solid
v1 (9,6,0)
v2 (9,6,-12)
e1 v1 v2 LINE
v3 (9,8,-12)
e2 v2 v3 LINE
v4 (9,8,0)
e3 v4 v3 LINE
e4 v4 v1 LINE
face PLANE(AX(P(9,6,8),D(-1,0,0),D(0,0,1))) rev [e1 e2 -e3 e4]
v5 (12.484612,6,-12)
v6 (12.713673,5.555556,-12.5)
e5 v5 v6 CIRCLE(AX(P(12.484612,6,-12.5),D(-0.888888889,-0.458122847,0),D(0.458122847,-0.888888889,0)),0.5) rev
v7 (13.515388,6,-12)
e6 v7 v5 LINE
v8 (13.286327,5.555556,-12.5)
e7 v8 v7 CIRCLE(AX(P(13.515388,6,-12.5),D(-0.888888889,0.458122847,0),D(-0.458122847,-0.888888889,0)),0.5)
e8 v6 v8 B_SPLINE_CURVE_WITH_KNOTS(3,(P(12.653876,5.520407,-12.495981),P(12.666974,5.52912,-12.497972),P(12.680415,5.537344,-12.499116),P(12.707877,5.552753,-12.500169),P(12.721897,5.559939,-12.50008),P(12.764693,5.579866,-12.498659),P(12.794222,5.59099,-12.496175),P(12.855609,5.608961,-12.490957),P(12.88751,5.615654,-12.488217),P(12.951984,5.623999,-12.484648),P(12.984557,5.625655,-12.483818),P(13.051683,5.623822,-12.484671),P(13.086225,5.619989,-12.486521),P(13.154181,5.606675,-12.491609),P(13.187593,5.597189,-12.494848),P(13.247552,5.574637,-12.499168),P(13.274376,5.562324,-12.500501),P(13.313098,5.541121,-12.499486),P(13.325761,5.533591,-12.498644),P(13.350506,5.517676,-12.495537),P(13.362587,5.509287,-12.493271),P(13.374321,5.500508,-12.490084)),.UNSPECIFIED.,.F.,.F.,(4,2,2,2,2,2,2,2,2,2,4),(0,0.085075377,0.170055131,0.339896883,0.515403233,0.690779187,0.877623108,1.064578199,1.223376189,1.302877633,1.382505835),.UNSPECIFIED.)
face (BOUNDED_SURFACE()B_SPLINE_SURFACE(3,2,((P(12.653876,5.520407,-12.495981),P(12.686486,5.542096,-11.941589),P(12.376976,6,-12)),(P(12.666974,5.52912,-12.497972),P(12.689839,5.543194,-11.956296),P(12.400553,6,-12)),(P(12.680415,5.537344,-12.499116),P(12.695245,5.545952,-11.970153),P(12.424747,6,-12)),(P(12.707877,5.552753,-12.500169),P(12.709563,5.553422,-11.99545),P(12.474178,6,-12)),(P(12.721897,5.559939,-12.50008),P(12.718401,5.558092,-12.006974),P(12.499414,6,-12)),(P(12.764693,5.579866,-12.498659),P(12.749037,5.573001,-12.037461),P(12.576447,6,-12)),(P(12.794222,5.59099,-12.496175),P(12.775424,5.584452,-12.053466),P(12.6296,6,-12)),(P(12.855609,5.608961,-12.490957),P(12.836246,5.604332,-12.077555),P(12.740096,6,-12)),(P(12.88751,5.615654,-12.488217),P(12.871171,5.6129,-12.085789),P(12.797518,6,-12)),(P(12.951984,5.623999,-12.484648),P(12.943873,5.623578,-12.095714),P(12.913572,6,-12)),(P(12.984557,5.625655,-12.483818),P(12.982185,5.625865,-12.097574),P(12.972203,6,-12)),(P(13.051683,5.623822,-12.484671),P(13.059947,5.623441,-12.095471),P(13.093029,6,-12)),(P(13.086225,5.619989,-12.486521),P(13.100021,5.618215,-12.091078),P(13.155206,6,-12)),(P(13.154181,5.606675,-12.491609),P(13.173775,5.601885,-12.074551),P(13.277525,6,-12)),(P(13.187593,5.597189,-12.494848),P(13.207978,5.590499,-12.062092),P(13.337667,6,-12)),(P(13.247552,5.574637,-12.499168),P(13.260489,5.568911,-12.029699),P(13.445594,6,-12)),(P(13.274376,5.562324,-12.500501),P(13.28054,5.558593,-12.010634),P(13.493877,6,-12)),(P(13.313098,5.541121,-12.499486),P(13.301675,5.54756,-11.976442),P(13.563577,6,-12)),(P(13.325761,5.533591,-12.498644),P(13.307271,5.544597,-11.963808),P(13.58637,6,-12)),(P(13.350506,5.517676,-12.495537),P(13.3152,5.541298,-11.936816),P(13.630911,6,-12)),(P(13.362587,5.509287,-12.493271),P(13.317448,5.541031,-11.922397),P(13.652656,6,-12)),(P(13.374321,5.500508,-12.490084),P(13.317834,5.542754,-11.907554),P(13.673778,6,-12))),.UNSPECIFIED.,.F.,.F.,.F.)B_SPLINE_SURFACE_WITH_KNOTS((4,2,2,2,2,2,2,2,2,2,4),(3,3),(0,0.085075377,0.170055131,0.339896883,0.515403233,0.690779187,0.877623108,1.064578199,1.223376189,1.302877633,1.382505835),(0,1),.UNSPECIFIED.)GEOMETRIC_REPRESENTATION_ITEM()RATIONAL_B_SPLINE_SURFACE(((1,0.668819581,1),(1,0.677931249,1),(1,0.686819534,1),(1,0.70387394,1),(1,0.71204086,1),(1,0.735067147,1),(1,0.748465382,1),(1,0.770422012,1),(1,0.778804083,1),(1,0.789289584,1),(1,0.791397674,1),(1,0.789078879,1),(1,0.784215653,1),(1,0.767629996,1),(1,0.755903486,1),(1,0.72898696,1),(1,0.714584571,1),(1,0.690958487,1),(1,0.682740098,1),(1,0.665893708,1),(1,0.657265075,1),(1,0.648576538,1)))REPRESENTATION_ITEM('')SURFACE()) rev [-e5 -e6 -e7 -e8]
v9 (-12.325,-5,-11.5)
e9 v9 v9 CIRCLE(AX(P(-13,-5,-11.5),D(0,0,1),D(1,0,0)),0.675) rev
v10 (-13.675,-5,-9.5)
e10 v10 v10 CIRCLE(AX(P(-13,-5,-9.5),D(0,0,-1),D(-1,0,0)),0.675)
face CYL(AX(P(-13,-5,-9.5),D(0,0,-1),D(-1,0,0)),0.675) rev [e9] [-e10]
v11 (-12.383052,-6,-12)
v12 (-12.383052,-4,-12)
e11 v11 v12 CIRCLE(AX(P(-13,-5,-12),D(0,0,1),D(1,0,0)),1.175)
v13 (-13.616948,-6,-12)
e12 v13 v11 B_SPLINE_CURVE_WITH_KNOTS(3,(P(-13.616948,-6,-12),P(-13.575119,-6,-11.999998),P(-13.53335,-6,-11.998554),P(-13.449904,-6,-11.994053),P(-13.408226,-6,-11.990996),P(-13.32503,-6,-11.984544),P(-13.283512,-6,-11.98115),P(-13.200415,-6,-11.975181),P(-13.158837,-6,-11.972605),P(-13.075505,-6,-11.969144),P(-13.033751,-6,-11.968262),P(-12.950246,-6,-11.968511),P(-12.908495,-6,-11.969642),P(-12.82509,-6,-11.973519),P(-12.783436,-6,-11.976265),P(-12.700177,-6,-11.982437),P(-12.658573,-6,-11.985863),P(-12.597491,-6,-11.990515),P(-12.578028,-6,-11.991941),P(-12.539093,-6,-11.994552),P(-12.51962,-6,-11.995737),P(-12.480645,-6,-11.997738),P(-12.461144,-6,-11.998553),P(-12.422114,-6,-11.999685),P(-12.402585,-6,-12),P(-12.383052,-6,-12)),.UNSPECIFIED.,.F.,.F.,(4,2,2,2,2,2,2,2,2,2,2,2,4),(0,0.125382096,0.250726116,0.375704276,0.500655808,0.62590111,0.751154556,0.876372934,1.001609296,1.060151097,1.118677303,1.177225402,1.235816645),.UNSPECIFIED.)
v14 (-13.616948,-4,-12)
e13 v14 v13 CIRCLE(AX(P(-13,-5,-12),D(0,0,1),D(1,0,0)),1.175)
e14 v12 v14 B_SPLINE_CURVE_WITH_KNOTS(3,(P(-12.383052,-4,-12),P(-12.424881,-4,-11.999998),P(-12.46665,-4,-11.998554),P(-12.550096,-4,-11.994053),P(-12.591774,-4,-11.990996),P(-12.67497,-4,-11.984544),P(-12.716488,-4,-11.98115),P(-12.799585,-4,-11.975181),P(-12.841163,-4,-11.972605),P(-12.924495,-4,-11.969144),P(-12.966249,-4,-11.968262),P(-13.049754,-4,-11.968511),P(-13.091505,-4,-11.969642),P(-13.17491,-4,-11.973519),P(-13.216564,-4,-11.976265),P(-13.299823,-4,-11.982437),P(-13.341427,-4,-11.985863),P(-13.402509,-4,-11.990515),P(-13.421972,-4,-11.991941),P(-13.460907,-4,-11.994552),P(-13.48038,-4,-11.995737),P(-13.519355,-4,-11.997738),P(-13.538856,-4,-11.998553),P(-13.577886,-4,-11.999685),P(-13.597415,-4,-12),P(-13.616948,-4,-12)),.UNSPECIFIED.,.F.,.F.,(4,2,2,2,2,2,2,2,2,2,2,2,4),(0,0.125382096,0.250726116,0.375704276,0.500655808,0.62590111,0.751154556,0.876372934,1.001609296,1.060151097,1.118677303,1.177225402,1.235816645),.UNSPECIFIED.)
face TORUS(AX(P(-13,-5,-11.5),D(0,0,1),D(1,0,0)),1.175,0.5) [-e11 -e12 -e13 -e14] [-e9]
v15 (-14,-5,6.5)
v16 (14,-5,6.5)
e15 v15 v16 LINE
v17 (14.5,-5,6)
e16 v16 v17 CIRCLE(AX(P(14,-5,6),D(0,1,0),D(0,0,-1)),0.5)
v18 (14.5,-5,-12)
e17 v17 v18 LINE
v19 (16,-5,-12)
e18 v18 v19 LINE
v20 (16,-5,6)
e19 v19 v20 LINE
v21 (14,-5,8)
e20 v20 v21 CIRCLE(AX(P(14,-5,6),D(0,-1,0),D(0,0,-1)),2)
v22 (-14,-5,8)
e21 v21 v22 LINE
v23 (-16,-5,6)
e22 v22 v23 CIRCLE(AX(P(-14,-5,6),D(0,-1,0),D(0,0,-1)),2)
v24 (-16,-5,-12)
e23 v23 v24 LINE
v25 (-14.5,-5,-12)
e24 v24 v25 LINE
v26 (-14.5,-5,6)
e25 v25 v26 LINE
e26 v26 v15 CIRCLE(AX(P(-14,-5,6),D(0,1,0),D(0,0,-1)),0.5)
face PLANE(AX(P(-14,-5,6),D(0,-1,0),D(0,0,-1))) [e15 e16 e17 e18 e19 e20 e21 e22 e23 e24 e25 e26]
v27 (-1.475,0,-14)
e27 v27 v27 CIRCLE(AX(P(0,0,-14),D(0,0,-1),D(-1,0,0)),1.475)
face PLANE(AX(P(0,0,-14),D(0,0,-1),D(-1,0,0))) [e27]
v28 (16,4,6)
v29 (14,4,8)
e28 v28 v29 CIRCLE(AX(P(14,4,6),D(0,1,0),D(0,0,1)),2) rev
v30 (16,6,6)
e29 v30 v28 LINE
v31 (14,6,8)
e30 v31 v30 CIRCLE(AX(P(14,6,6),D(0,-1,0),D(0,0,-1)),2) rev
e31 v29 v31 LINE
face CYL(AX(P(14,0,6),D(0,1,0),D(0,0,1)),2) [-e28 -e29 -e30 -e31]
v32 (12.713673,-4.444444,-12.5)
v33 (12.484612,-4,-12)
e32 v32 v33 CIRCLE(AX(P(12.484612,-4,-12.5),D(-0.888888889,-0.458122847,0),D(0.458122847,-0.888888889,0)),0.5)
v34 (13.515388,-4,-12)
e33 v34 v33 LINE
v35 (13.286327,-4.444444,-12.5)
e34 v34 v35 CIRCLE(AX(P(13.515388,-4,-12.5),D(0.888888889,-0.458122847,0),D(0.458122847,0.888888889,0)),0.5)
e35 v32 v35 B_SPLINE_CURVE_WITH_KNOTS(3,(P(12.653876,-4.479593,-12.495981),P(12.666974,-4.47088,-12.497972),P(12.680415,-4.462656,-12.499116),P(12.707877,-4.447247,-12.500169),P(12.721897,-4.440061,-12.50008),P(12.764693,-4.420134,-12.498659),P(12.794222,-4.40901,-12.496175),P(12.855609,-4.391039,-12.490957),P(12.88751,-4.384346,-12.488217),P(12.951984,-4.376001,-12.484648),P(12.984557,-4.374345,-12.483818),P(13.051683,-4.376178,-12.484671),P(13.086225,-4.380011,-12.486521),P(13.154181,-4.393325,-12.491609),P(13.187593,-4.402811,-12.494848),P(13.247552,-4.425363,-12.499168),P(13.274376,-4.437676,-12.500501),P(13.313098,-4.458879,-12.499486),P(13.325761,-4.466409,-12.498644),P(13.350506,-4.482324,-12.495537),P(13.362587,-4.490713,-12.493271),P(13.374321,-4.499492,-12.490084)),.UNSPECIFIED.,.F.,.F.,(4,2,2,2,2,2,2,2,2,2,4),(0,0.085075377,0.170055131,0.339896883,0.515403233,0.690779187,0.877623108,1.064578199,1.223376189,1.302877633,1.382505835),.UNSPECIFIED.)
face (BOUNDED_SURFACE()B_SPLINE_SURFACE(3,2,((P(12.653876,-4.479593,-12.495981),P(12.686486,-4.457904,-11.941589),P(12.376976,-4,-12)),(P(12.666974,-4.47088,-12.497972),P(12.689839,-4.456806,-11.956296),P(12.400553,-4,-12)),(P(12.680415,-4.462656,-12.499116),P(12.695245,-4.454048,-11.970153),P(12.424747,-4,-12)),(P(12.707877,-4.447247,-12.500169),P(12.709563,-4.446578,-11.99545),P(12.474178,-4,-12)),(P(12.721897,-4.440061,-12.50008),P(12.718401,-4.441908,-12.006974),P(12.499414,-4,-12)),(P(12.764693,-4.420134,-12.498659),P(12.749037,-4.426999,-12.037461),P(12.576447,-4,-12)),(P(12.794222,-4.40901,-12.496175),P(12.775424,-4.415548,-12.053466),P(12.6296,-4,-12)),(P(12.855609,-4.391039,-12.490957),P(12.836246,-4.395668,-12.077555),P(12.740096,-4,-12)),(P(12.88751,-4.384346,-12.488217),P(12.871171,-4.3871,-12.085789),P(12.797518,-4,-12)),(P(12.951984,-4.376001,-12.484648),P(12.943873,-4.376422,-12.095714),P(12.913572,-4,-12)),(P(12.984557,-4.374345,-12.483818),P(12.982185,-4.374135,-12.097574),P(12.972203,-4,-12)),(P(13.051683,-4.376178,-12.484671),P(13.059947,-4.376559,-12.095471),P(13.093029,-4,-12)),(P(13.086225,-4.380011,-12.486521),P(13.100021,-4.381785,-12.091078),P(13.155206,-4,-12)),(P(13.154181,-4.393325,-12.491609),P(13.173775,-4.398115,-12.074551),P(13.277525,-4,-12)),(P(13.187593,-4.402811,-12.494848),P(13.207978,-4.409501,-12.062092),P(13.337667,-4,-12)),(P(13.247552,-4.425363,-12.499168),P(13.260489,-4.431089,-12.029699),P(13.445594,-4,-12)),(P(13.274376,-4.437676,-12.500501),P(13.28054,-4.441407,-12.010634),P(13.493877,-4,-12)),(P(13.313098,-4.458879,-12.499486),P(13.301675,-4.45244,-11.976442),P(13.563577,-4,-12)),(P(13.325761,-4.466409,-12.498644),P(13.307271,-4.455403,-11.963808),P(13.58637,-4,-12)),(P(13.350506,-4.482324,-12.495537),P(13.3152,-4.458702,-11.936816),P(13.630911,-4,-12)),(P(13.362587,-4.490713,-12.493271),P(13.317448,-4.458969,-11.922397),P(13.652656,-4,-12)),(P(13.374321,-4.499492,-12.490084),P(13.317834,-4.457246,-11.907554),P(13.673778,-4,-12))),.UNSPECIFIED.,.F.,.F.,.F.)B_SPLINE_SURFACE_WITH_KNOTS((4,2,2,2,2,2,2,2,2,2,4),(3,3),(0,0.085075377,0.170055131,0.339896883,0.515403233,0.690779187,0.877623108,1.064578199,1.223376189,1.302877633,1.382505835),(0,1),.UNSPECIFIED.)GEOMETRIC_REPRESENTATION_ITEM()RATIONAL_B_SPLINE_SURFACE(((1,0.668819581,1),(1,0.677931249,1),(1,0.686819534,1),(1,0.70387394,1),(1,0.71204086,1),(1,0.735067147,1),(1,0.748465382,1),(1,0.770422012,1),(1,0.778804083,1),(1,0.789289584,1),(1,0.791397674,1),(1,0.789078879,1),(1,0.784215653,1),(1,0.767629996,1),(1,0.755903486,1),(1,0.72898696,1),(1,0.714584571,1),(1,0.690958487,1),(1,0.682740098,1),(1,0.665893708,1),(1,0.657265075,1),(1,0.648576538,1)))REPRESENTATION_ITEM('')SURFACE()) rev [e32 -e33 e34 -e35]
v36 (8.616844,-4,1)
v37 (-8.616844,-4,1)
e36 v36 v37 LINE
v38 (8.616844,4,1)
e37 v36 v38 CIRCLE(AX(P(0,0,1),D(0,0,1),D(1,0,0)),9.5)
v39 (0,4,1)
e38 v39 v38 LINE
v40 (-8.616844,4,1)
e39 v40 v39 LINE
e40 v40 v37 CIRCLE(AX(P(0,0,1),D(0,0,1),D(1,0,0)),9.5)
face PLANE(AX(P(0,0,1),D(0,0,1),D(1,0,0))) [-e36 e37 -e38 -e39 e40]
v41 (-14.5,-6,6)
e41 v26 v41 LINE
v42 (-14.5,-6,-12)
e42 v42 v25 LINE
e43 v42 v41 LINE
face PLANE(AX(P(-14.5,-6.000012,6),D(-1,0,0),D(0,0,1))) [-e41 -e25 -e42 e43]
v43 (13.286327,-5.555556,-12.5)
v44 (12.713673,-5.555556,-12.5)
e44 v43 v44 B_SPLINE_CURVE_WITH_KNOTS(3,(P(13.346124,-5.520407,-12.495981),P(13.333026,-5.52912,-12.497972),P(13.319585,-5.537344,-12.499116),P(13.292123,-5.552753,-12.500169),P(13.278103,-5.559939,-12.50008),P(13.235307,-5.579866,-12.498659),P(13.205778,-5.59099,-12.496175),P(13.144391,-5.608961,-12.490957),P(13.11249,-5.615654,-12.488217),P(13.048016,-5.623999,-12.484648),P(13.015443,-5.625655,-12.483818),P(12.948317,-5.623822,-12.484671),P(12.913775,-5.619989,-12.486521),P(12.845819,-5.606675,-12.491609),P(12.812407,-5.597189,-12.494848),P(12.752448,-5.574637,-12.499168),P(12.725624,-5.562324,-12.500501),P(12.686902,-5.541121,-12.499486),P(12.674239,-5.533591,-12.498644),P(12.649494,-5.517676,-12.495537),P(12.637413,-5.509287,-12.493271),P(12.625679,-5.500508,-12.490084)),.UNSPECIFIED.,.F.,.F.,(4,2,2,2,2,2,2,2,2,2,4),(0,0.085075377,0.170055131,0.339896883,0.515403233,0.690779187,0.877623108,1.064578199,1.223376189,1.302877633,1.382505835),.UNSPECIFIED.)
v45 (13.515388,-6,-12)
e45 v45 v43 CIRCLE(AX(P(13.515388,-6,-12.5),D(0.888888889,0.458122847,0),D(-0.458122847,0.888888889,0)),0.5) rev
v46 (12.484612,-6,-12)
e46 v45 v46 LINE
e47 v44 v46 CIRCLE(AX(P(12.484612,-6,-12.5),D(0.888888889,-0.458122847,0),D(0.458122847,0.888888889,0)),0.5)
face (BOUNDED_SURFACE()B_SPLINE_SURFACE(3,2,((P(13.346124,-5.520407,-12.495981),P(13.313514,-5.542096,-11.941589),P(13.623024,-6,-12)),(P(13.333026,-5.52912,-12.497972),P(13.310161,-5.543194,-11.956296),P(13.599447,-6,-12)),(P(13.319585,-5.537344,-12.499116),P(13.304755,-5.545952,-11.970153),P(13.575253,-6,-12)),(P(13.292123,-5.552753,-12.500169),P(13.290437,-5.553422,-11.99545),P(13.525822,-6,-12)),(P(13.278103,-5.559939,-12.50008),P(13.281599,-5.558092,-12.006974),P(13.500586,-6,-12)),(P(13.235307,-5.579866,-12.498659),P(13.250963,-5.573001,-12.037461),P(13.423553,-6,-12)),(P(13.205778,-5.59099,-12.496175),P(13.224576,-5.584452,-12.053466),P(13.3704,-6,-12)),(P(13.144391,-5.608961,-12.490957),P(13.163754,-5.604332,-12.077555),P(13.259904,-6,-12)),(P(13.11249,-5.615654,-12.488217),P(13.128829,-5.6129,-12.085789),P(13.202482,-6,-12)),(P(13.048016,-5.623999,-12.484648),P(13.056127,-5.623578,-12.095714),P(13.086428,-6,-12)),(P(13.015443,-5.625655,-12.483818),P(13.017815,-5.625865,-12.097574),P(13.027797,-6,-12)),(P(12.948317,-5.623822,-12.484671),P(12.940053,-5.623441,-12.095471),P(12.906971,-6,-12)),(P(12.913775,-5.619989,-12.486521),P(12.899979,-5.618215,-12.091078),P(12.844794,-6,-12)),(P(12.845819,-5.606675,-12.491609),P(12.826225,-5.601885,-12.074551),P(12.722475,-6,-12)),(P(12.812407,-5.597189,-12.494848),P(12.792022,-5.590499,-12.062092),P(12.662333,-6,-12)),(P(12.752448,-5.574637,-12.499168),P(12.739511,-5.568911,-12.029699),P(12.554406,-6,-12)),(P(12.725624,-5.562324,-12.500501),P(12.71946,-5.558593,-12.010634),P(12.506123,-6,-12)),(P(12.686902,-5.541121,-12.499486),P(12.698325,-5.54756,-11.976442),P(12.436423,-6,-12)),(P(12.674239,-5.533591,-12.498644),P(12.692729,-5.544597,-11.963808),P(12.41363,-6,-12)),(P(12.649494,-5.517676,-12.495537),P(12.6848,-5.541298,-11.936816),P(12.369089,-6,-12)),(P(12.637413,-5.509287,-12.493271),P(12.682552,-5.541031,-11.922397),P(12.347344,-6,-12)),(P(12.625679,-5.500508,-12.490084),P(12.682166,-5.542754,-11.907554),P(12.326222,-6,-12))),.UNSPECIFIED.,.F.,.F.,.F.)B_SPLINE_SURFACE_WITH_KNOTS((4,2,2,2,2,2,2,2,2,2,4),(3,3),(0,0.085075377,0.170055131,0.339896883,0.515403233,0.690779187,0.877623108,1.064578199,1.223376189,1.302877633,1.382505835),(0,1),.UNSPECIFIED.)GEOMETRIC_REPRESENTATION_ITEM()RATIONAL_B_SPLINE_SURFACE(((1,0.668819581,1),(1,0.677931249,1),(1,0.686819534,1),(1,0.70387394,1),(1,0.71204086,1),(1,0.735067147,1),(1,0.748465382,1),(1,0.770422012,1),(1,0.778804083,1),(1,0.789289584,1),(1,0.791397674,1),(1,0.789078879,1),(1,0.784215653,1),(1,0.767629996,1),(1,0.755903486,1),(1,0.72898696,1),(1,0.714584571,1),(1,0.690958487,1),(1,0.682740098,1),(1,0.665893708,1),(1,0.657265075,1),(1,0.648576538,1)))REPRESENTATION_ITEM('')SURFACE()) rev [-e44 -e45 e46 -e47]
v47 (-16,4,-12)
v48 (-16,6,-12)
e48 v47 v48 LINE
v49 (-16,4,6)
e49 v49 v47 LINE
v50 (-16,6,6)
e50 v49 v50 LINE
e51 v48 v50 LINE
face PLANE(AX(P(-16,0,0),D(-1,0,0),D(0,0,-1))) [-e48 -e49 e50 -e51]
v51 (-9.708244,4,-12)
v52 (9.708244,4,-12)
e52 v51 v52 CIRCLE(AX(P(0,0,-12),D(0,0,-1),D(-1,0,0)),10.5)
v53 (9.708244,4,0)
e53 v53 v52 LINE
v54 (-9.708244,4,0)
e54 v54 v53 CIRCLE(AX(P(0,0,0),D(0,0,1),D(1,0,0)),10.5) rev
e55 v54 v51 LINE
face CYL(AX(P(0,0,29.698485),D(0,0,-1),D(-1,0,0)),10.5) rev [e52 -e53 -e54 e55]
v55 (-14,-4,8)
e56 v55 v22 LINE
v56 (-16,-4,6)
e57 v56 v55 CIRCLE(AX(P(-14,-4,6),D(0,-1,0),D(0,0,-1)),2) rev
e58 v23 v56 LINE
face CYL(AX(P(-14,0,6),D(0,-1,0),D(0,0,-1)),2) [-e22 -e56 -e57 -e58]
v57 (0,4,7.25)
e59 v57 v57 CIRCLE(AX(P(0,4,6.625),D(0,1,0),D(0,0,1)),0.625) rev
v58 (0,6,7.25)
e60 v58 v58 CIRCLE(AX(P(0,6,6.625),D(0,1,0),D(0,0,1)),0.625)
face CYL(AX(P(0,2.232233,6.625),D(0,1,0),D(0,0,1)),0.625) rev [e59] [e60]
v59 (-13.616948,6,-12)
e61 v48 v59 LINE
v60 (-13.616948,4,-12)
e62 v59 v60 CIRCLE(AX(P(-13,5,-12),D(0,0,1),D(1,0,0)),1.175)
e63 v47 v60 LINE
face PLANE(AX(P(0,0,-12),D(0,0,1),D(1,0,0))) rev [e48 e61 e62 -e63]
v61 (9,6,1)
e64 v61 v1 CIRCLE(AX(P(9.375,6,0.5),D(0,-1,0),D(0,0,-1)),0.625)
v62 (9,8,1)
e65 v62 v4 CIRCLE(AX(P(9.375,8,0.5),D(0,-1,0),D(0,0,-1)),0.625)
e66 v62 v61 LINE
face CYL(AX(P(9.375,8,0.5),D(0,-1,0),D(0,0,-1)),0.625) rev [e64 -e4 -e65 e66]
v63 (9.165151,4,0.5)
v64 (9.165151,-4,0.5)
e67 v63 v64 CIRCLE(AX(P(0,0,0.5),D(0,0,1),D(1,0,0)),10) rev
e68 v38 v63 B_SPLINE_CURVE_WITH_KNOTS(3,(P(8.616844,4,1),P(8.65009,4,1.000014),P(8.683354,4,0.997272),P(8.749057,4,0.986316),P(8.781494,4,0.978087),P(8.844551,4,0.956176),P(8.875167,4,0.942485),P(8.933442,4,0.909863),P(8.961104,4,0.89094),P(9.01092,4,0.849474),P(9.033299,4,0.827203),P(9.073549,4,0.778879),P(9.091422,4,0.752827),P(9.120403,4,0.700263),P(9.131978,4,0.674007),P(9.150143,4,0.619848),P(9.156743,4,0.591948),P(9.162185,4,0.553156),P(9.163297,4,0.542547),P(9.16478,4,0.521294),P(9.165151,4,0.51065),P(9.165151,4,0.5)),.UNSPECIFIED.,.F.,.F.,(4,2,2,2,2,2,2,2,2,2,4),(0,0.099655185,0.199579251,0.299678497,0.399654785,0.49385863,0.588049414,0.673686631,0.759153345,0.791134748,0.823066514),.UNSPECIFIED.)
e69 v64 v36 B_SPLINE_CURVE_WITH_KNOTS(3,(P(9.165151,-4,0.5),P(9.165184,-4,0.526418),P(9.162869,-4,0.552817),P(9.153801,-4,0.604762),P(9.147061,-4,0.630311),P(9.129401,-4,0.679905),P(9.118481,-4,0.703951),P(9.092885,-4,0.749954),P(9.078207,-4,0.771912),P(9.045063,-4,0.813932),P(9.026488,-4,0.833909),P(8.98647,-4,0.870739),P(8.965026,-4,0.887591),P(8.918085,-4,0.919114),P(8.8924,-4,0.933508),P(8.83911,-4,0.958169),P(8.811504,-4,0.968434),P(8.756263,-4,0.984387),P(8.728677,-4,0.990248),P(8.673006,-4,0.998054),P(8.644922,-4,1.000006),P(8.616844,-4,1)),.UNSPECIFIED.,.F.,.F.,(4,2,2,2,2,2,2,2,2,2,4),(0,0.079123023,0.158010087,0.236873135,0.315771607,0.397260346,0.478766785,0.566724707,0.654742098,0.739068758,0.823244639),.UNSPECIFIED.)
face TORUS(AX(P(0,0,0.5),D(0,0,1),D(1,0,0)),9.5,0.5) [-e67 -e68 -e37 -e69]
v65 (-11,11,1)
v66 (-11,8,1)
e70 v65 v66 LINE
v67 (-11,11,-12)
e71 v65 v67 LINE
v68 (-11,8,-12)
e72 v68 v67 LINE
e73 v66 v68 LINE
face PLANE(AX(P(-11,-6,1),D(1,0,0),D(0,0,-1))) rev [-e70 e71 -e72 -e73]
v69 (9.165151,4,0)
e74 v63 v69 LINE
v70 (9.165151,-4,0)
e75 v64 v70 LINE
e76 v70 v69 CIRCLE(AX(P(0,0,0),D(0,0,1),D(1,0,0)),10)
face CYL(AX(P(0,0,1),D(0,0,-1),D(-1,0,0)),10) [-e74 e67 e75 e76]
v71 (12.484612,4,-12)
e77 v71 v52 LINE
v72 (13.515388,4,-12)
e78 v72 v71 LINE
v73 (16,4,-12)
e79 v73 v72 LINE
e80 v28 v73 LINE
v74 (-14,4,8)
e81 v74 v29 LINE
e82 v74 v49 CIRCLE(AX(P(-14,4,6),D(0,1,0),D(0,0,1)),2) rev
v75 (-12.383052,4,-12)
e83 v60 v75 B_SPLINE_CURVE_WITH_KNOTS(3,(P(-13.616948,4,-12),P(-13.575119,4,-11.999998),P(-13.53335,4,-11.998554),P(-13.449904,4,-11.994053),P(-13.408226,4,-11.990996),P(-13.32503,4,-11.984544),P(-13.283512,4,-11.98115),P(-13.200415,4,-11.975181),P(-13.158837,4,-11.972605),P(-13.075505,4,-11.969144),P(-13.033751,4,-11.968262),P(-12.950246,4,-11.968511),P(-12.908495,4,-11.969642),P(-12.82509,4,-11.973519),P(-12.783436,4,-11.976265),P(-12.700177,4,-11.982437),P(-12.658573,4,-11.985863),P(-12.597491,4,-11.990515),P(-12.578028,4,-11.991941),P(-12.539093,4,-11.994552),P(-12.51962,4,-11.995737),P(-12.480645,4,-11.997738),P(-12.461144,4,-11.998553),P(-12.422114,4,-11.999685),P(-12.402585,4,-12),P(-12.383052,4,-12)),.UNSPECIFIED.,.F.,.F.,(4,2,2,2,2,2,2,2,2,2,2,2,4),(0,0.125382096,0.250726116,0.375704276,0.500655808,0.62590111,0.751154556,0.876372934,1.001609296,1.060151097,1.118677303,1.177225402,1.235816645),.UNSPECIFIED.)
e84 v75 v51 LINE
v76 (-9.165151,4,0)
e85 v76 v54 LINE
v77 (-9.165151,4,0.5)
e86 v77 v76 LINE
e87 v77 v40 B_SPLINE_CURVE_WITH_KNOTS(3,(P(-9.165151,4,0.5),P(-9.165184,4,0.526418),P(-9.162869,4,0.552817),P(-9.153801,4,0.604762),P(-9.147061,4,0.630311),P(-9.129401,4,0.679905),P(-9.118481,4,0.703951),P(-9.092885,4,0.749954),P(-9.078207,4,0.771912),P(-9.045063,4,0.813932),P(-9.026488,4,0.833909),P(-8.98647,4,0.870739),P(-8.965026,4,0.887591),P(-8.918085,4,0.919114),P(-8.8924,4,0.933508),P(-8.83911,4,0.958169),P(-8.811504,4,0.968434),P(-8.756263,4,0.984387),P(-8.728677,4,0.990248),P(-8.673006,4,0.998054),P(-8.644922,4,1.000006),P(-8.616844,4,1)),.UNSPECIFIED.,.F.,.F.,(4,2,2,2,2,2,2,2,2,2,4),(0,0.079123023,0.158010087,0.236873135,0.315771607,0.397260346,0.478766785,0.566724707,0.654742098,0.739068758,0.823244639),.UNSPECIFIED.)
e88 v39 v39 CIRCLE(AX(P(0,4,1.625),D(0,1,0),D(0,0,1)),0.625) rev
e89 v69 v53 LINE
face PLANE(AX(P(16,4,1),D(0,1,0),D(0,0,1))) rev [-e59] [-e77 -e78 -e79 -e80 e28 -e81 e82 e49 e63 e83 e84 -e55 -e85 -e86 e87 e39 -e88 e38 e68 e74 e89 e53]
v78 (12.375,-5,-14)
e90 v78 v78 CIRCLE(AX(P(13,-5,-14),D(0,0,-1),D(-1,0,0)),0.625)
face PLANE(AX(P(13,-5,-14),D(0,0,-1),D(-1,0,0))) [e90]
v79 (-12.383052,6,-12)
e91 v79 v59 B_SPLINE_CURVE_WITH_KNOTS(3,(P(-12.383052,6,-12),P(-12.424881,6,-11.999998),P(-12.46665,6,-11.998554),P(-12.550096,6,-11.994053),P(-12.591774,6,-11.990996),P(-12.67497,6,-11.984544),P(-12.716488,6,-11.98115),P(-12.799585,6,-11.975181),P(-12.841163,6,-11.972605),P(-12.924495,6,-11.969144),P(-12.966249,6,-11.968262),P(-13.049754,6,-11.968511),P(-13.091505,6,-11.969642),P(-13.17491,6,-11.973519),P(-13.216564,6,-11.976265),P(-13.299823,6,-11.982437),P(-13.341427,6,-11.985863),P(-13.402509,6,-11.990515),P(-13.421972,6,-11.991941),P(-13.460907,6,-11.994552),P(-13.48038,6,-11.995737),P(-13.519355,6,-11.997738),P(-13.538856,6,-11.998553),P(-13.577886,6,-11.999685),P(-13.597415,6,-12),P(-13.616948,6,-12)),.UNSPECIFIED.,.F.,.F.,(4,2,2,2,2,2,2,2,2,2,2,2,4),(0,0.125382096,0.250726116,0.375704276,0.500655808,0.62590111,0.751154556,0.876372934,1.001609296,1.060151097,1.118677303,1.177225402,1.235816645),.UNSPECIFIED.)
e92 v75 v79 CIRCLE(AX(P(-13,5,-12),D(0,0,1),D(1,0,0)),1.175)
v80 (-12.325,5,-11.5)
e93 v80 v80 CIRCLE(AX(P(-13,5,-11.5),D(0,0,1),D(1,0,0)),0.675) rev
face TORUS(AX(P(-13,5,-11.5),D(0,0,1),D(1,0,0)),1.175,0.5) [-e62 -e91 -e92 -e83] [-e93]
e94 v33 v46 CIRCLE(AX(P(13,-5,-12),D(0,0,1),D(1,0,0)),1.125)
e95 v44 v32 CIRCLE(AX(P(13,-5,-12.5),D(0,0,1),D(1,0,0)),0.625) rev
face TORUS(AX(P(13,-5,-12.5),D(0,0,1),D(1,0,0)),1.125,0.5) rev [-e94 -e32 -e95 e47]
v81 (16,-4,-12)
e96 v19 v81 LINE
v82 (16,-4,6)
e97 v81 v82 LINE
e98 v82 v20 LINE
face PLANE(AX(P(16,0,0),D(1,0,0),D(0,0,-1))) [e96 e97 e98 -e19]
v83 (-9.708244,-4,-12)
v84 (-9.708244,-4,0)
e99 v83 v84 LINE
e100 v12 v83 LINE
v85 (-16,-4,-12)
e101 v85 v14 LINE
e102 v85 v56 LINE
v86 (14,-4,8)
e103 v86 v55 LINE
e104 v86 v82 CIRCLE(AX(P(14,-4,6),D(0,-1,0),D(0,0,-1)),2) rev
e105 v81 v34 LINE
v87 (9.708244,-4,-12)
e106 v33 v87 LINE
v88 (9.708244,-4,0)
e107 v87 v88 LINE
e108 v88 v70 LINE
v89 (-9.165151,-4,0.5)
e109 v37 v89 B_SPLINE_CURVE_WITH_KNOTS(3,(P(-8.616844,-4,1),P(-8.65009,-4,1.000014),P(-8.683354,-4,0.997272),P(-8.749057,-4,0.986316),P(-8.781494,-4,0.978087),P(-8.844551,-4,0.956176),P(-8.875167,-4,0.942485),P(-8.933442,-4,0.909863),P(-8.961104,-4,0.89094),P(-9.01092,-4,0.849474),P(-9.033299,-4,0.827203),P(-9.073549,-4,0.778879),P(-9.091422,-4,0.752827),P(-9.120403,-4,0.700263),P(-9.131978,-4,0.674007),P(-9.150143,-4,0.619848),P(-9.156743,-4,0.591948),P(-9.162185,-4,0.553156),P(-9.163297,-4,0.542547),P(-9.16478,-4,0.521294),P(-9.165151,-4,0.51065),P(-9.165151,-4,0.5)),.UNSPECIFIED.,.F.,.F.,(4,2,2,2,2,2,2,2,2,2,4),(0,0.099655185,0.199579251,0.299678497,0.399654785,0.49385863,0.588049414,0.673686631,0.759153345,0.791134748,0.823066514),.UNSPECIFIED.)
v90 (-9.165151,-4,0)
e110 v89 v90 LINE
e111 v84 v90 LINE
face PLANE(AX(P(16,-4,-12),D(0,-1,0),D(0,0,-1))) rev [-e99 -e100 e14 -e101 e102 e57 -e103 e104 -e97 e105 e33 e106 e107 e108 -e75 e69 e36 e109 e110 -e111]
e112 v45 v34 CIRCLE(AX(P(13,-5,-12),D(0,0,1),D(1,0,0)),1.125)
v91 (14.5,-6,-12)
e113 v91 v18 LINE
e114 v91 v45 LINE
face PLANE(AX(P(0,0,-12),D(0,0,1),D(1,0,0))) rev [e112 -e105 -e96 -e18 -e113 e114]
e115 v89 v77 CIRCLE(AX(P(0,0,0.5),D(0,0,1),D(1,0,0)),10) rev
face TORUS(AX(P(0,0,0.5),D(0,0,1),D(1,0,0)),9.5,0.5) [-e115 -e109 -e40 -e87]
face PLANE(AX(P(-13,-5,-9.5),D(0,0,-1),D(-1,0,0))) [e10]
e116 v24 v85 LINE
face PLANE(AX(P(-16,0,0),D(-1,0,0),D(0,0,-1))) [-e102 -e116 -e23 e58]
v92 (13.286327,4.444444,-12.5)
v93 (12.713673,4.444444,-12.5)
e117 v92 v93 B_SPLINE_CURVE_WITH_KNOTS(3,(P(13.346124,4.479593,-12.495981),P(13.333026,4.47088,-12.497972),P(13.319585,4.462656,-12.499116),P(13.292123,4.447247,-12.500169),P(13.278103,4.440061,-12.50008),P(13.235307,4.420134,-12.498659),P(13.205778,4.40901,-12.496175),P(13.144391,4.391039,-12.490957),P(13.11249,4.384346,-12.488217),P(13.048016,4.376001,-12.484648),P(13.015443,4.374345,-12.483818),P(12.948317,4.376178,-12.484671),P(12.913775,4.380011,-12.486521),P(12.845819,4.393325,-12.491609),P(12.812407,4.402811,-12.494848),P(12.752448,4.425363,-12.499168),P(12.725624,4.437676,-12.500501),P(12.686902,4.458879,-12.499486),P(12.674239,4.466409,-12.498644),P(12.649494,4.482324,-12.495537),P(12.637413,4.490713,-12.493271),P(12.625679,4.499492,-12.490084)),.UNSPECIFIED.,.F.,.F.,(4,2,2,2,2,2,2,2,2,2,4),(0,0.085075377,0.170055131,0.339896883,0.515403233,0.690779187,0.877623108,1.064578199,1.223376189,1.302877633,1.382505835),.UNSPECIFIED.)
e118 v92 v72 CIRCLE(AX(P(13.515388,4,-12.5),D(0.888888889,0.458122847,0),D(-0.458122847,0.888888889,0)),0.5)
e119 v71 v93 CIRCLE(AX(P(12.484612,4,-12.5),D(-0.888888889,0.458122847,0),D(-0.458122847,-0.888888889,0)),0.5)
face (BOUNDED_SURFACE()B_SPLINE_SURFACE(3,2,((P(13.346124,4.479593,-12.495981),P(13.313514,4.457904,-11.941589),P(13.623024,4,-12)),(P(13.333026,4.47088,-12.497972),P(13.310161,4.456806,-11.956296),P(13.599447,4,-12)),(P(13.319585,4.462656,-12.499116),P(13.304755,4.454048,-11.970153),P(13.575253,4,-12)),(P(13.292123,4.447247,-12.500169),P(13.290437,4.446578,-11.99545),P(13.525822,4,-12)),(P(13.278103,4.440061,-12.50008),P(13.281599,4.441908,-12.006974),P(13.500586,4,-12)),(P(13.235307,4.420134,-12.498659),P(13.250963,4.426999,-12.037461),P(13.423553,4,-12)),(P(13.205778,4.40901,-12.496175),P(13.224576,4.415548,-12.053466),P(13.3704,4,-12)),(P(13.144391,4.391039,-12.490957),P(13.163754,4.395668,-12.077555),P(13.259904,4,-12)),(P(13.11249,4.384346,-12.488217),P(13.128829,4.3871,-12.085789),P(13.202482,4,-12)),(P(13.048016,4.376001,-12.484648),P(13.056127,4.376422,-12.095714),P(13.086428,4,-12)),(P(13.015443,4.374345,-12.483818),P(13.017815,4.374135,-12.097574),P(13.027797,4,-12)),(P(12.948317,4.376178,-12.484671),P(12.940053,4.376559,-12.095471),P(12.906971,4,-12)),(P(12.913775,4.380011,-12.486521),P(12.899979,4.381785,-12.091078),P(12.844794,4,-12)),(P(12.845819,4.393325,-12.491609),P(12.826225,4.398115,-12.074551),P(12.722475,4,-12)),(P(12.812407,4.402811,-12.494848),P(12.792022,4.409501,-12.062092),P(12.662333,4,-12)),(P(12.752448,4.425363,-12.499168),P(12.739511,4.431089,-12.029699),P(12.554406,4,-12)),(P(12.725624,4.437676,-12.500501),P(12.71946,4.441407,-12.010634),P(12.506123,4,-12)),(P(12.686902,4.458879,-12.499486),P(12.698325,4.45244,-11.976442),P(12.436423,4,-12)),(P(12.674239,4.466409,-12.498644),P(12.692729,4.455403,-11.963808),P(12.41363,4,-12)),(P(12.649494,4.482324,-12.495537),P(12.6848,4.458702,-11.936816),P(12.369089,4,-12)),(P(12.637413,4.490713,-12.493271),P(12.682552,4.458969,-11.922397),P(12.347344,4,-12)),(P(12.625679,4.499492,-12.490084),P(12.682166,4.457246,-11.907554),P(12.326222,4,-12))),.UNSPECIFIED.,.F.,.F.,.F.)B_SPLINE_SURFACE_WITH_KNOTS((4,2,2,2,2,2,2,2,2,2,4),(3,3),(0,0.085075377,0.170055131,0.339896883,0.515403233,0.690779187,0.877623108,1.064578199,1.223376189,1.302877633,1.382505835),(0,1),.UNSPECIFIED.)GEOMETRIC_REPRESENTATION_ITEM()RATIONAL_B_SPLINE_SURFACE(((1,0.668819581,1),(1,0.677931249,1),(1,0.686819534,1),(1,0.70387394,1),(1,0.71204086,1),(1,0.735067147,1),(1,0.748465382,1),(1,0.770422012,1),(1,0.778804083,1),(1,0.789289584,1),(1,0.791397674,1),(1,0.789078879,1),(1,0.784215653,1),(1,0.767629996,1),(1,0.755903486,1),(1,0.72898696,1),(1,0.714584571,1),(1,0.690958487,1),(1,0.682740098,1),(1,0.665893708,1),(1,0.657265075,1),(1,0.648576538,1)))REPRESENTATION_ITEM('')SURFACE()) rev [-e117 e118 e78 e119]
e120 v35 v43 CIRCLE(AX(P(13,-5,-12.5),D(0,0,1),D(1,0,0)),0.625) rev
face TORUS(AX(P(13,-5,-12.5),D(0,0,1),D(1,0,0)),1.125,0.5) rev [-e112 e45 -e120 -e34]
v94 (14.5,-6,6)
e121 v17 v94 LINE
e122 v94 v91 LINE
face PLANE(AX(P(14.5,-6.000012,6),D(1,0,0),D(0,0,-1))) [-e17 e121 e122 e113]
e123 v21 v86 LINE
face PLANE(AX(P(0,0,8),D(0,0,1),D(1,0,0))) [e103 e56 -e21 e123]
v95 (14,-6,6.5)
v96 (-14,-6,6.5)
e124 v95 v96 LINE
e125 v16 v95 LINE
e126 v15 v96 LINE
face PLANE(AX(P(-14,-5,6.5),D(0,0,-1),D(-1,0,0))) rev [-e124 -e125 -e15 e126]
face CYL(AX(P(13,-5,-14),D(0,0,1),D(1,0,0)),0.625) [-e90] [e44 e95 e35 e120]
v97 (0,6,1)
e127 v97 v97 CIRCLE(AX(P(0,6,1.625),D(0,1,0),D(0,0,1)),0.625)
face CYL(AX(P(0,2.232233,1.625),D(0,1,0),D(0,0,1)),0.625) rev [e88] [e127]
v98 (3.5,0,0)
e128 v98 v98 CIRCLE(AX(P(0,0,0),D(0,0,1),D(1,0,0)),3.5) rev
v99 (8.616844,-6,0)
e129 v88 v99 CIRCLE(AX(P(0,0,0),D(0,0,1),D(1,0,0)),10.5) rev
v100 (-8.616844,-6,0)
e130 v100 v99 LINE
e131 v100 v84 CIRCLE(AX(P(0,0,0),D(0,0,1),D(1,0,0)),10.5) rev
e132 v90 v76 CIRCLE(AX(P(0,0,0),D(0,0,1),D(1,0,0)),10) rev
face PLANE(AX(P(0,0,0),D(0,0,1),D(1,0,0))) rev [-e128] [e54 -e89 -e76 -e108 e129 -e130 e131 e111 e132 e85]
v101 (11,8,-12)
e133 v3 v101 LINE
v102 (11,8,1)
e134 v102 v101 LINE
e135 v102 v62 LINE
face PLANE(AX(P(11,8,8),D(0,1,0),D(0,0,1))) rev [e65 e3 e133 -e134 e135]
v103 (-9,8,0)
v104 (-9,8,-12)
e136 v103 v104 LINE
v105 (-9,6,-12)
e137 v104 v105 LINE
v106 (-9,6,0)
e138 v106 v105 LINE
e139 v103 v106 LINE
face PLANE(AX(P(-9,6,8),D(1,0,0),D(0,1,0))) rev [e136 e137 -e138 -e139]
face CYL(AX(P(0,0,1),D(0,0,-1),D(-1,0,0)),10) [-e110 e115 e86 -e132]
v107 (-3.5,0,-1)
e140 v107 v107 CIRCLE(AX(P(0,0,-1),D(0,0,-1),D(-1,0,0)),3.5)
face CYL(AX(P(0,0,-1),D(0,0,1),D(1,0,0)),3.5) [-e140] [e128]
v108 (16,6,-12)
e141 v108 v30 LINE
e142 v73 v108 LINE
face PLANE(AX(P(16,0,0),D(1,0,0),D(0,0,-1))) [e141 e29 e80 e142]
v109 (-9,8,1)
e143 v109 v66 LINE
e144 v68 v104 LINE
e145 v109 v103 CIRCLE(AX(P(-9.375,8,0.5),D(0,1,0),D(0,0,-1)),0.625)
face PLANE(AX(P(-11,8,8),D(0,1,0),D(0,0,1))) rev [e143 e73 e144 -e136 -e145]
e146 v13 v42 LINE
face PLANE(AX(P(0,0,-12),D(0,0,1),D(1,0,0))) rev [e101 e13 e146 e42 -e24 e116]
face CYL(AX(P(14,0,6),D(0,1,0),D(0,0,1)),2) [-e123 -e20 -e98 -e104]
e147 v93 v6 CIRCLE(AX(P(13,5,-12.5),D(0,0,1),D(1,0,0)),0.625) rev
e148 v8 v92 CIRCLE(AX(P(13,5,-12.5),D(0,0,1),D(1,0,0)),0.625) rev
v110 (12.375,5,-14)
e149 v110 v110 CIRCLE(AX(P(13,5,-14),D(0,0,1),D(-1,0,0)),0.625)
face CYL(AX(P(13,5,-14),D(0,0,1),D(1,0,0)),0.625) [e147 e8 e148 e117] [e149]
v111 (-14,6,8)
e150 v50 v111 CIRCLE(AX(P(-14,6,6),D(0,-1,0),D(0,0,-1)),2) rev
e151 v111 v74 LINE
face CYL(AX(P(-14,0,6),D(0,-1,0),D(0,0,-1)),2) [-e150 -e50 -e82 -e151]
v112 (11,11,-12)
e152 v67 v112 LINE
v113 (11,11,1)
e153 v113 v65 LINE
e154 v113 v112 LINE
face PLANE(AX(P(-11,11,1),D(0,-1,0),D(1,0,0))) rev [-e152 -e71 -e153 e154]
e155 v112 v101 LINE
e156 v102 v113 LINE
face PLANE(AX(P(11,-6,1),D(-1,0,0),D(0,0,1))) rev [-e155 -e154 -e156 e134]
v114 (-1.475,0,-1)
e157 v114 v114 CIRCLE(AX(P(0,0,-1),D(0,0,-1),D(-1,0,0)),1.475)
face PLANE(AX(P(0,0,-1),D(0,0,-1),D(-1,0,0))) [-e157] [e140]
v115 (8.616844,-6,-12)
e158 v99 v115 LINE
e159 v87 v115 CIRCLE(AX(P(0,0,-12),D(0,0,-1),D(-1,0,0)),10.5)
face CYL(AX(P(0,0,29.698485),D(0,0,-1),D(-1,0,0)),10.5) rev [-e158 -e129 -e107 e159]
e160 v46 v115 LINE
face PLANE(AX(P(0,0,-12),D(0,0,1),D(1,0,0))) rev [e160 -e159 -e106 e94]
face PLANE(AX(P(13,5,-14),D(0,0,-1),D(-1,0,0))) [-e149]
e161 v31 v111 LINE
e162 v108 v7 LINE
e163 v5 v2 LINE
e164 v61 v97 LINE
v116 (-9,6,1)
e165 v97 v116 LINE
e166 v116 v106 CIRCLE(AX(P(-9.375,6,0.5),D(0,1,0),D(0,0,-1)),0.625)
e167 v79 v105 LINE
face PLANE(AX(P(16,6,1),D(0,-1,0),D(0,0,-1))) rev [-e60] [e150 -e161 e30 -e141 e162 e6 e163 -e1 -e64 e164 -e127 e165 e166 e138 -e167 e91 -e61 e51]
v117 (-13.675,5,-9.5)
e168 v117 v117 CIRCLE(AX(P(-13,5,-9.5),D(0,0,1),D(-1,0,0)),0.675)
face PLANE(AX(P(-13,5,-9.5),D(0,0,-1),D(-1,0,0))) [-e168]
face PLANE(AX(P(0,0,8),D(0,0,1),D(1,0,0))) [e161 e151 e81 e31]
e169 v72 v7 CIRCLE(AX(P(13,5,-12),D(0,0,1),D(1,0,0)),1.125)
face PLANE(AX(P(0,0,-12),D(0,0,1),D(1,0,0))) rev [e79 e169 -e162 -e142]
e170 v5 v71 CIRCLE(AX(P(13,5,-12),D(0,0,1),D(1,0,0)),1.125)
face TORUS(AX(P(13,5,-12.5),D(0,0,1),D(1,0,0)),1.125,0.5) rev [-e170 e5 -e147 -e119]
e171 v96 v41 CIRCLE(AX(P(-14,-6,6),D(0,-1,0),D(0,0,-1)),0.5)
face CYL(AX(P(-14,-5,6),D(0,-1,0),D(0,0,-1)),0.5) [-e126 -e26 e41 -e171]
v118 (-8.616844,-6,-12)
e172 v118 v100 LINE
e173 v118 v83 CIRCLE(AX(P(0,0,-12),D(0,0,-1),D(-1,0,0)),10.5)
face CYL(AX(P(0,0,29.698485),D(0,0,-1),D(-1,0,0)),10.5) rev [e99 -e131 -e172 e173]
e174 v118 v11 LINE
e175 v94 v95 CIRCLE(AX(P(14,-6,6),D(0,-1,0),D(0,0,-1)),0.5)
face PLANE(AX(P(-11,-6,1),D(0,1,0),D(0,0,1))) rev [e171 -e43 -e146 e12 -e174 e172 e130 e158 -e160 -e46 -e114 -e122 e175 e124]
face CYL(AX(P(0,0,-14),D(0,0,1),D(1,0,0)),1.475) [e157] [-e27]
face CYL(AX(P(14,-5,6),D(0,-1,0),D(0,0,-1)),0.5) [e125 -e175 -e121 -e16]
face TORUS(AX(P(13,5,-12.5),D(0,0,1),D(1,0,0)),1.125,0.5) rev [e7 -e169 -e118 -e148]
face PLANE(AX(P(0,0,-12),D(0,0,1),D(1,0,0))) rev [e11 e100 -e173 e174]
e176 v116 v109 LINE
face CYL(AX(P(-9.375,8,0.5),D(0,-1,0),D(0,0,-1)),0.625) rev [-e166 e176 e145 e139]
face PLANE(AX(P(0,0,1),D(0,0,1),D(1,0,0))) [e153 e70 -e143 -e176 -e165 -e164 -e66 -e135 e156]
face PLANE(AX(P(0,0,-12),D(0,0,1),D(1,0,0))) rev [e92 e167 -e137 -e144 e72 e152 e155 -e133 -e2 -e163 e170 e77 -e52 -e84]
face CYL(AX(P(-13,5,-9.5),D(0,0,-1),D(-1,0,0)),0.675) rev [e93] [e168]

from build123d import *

# Parameters (mm, degrees)
BOSS_EXTRUDE1_DEPTH     = 1
SKETCH2_R               = 1.475
BOSS_EXTRUDE2_DEPTH     = 14
SKETCH3_R               = 3.5
BOSS_EXTRUDE3_DEPTH     = 1
SKETCH4_W               = 2
SKETCH4_H               = 17
BOSS_EXTRUDE4_DEPTH     = 12
SKETCH5_W               = 18
SKETCH5_H               = 2
BOSS_EXTRUDE5_DEPTH     = 12
SKETCH6_W               = 13
SKETCH6_H               = 2
BOSS_EXTRUDE6_DEPTH     = 5
BOSS_EXTRUDE7_DEPTH     = 12
CUT_EXTRUDE1_DEPTH      = 24.366642891
SKETCH9_W               = 2.937742252
SKETCH9_H               = 8
CUT_EXTRUDE2_DEPTH      = 12
CUT_EXTRUDE11_START     = -12
SKETCH21_R              = 10.5
SKETCH21_R_2            = 3.5
CUT_EXTRUDE11_DEPTH     = 12
SKETCH10_W              = 32
SKETCH10_H              = 2
BOSS_EXTRUDE8_DEPTH     = 7
FILLET1_R               = 0.5
SKETCH11_R              = 0.625
BOSS_EXTRUDE9_DEPTH     = 2
SKETCH14_W              = 2
SKETCH14_H              = 2
CUT_EXTRUDE5_DEPTH      = 28.874719859
SKETCH12_R              = 0.675
CUT_EXTRUDE3_DEPTH      = 2.5
CUT_EXTRUDE6_DEPTH      = 2
FILLET2_R               = 0.5
FILLET3_R               = 0.5
FILLET4_R               = 2
CUT_EXTRUDE7_DEPTH      = 28.221315288
CUT_EXTRUDE7_DEPTH_BACK = 1
SKETCH19_R              = 0.625
CUT_EXTRUDE9_DEPTH      = 2


with BuildPart() as part:
    # Sketch1 → Boss-Extrude1 (new body)
    with BuildSketch(Plane.XY):
        Polygon((-11, 6), (-11, 11), (11, 11), (11, 6), (11, -6), (-11, -6), align=None)
    extrude(amount=BOSS_EXTRUDE1_DEPTH)

    # Sketch2 → Boss-Extrude2 (add)
    with BuildSketch(Plane(origin=(0, 0, 0), x_dir=(-1, 0, 0), z_dir=(0, 0, -1))):
        with Locations(Location((0, 0, 0), (0, 0, 180))):
            Circle(SKETCH2_R)
    extrude(amount=BOSS_EXTRUDE2_DEPTH)

    # Sketch3 → Boss-Extrude3 (add)
    with BuildSketch(Plane(origin=(0, 0, 0), x_dir=(-1, 0, 0), z_dir=(0, 0, -1))):
        with Locations(Location((0, 0, 0), (0, 0, 180))):
            Circle(SKETCH3_R)
    extrude(amount=BOSS_EXTRUDE3_DEPTH)

    # Sketch4 → Boss-Extrude4 (add)
    with BuildSketch(Plane(origin=(0, 0, 0), x_dir=(-1, 0, 0), z_dir=(0, 0, -1))):
        with Locations((10, 2.5)):
            Rectangle(SKETCH4_W, SKETCH4_H)
        with Locations((-10, 2.5)):
            Rectangle(SKETCH4_W, SKETCH4_H)
    extrude(amount=BOSS_EXTRUDE4_DEPTH)

    # Sketch5 → Boss-Extrude5 (add)
    with BuildSketch(Plane(origin=(0, 0, 0), x_dir=(-1, 0, 0), z_dir=(0, 0, -1))):
        with Locations((0, 10)):
            Rectangle(SKETCH5_W, SKETCH5_H)
    extrude(amount=BOSS_EXTRUDE5_DEPTH)

    # Sketch6 → Boss-Extrude6 (add)
    with BuildSketch(Plane(origin=(11, 0, 0), x_dir=(0, 0, -1), z_dir=(1, 0, 0))):
        with Locations((5.5, -5)):
            Rectangle(SKETCH6_W, SKETCH6_H)
        with Locations((5.5, 5)):
            Rectangle(SKETCH6_W, SKETCH6_H)
    boss_extrude6 = extrude(amount=BOSS_EXTRUDE6_DEPTH)

    # Mirror1: Boss-Extrude6 across plane
    add(boss_extrude6.mirror(Plane(origin=(0, 0, 0), x_dir=(0, 0, 1), z_dir=(1, 0, 0))))

    # Sketch7 → Boss-Extrude7 (add)
    with BuildSketch(Plane(origin=(0, 0, -12), x_dir=(-1, 0, 0), z_dir=(0, 0, -1))):
        with BuildLine():
            ThreePointArc((-6.708203932, -6), (-8.407551231, -3.211398808), (-9, 0))
            Line((-9, 0), (-9, -6))
            Line((-9, -6), (-6.708203932, -6))
        make_face()
        with BuildLine():
            Line((-9, 9), (-9, 0))
            ThreePointArc((-9, 0), (-6.363961031, 6.363961031), (0, 9))
            Line((0, 9), (-9, 9))
        make_face()
    boss_extrude7 = extrude(amount=-BOSS_EXTRUDE7_DEPTH)

    # Sketch8 → Cut-Extrude1 (cut, through all)
    with BuildSketch(Plane(origin=(0, 0, -12), x_dir=(-1, 0, 0), z_dir=(0, 0, -1))):
        with BuildLine():
            Line((-11, 4), (-9.16515139, 4))
            ThreePointArc((-9.16515139, 4), (-10, 0), (-9.16515139, -4))
            Line((-9.16515139, -4), (-11, -4))
            Line((-11, -4), (-11, 4))
        make_face()
    cut_extrude1 = extrude(amount=-CUT_EXTRUDE1_DEPTH, mode=Mode.SUBTRACT)

    # Sketch9 → Cut-Extrude2 (cut)
    with BuildSketch(Plane(origin=(0, 0, -12), x_dir=(-1, 0, 0), z_dir=(0, 0, -1))):
        with Locations((-9.531128874, 0)):
            Rectangle(SKETCH9_W, SKETCH9_H)
    cut_extrude2 = extrude(amount=-CUT_EXTRUDE2_DEPTH, mode=Mode.SUBTRACT)

    # Mirror2: Boss-Extrude7, Cut-Extrude1, Cut-Extrude2 across plane
    add(boss_extrude7.mirror(Plane(origin=(0, 0, 0), x_dir=(0, 0, 1), z_dir=(1, 0, 0))))
    add(cut_extrude1.mirror(Plane(origin=(0, 0, 0), x_dir=(0, 0, 1), z_dir=(1, 0, 0))), mode=Mode.SUBTRACT)
    add(cut_extrude2.mirror(Plane(origin=(0, 0, 0), x_dir=(0, 0, 1), z_dir=(1, 0, 0))), mode=Mode.SUBTRACT)

    # Sketch21 → Cut-Extrude11 (cut)
    with BuildSketch(Plane(origin=(0, 0, -12), x_dir=(-1, 0, 0), z_dir=(0, 0, -1)).offset(CUT_EXTRUDE11_START)):
        Circle(SKETCH21_R)
        with Locations(Location((0, 0, 0), (0, 0, 180))):
            Circle(SKETCH21_R_2, mode=Mode.SUBTRACT)
    extrude(amount=CUT_EXTRUDE11_DEPTH, mode=Mode.SUBTRACT)

    # Sketch10 → Boss-Extrude8 (add)
    with BuildSketch(Plane.XY.offset(1)):
        with Locations((0, -5)):
            Rectangle(SKETCH10_W, SKETCH10_H)
        with Locations((0, 5)):
            Rectangle(SKETCH10_W, SKETCH10_H)
    extrude(amount=BOSS_EXTRUDE8_DEPTH)

    # Fillet1
    fillet1_edges = [part.edges().sort_by_distance(p)[0] for p in [
        (10, 0, 1),
        (-10, 0, 1),
    ]]
    fillet(fillet1_edges, radius=FILLET1_R)

    # Sketch11 → Boss-Extrude9 (add)
    with BuildSketch(Plane(origin=(0, 0, -12), x_dir=(-1, 0, 0), z_dir=(0, 0, -1))):
        with Locations(Location((-13, -5, 0), (0, 0, 180))):
            Circle(SKETCH11_R)
    boss_extrude9 = extrude(amount=BOSS_EXTRUDE9_DEPTH)

    # Sketch14 → Cut-Extrude5 (cut, through all)
    with BuildSketch(Plane(origin=(0, 0, -12), x_dir=(-1, 0, 0), z_dir=(0, 0, -1))):
        with Locations((10, 7)):
            Rectangle(SKETCH14_W, SKETCH14_H)
        with Locations((-10, 7)):
            Rectangle(SKETCH14_W, SKETCH14_H)
    extrude(amount=-CUT_EXTRUDE5_DEPTH, mode=Mode.SUBTRACT)

    # Sketch12 → Cut-Extrude3 (cut)
    with BuildSketch(Plane(origin=(0, 0, -12), x_dir=(-1, 0, 0), z_dir=(0, 0, -1))):
        with Locations((13, -5)):
            Circle(SKETCH12_R)
    cut_extrude3 = extrude(amount=-CUT_EXTRUDE3_DEPTH, mode=Mode.SUBTRACT)

    # Sketch16 → Cut-Extrude6 (cut)
    with BuildSketch(Plane(origin=(0, 6, 0), x_dir=(1, 0, 0), z_dir=(0, 1, 0))):
        with BuildLine():
            Line((-9, 0), (-9, -1))
            ThreePointArc((-9, -1), (-8.75, -0.5), (-9, 0))
        make_face()
    cut_extrude6 = extrude(amount=CUT_EXTRUDE6_DEPTH, mode=Mode.SUBTRACT)

    # Mirror3: Boss-Extrude9, Cut-Extrude3 across plane
    add(boss_extrude9.mirror(Plane.ZX))
    add(cut_extrude3.mirror(Plane.ZX), mode=Mode.SUBTRACT)

    # Mirror4: Cut-Extrude6 across plane
    add(cut_extrude6.mirror(Plane(origin=(0, 0, 0), x_dir=(0, 0, 1), z_dir=(1, 0, 0))), mode=Mode.SUBTRACT)

    # Fillet2
    fillet2_edges = [part.edges().sort_by_distance(p)[0] for p in [
        (12.375, -5, -12),
        (12.375, 5, -12),
    ]]
    fillet(fillet2_edges, radius=FILLET2_R)

    # Fillet3
    # the kernel refuses this fillet: 0.5 mm, written as the material it takes off along each edge
    with BuildSketch(Plane(origin=(-13, -5, -12), x_dir=(-1, 0, 0), z_dir=(0, -1, 0))) as fillet3_piece_1:
        with BuildLine():
            CenterArc((0.675 + FILLET3_R, -FILLET3_R), FILLET3_R, 90, 90)
            Line((0.675, -FILLET3_R), (0.675, 0))
            Line((0.675, 0), (0.675 + FILLET3_R, 0))
        make_face()
    revolve(axis=Axis((-13, -5, -12), (0, 0, -1)), mode=Mode.SUBTRACT)
    with BuildSketch(Plane(origin=(-13, 5, -12), x_dir=(-1, 0, 0), z_dir=(0, 1, 0))) as fillet3_piece_2:
        with BuildLine():
            CenterArc((0.675 + FILLET3_R, FILLET3_R), FILLET3_R, 180, 90)
            Line((0.675, FILLET3_R), (0.675, 0))
            Line((0.675, 0), (0.675 + FILLET3_R, 0))
        make_face()
    revolve(axis=Axis((-13, 5, -12), (0, 0, 1)), mode=Mode.SUBTRACT)

    # Fillet4
    fillet4_edges = [part.edges().sort_by_distance(p)[0] for p in [
        (16, -5, 8),
        (-16, -5, 8),
        (-16, 5, 8),
        (16, 5, 8),
    ]]
    fillet(fillet4_edges, radius=FILLET4_R)

    # Sketch17 → Cut-Extrude7 (cut, two sides: drawn at the far end of the back side and taken through both)
    with BuildSketch(Plane.XZ.offset(6).offset(-CUT_EXTRUDE7_DEPTH_BACK)):
        with BuildLine():
            Line((-16, 6), (-16, -12))
            Line((-16, -12), (-14.5, -12))
            Line((-14.5, -12), (-14.5, 6))
            ThreePointArc((-14.5, 6), (-14.353553391, 6.353553391), (-14, 6.5))
            Line((-14, 6.5), (14, 6.5))
            ThreePointArc((14, 6.5), (14.353553391, 6.353553391), (14.5, 6))
            Line((14.5, 6), (14.5, -12))
            Line((14.5, -12), (16, -12))
            Line((16, -12), (16, 6))
            ThreePointArc((16, 6), (15.414213562, 7.414213562), (14, 8))
            Line((14, 8), (-14, 8))
            ThreePointArc((-14, 8), (-15.414213562, 7.414213562), (-16, 6))
        make_face()
    extrude(amount=CUT_EXTRUDE7_DEPTH + CUT_EXTRUDE7_DEPTH_BACK, mode=Mode.SUBTRACT)

    # Sketch19 → Cut-Extrude9 (cut)
    with BuildSketch(Plane(origin=(0, 6, 0), x_dir=(1, 0, 0), z_dir=(0, 1, 0))):
        with Locations(Location((0, -1.625, 0), (0, 0, 90))):
            Circle(SKETCH19_R)
        with Locations(Location((0, -6.625, 0), (0, 0, 270))):
            Circle(SKETCH19_R)
    extrude(amount=-CUT_EXTRUDE9_DEPTH, mode=Mode.SUBTRACT)


solid = part.part
